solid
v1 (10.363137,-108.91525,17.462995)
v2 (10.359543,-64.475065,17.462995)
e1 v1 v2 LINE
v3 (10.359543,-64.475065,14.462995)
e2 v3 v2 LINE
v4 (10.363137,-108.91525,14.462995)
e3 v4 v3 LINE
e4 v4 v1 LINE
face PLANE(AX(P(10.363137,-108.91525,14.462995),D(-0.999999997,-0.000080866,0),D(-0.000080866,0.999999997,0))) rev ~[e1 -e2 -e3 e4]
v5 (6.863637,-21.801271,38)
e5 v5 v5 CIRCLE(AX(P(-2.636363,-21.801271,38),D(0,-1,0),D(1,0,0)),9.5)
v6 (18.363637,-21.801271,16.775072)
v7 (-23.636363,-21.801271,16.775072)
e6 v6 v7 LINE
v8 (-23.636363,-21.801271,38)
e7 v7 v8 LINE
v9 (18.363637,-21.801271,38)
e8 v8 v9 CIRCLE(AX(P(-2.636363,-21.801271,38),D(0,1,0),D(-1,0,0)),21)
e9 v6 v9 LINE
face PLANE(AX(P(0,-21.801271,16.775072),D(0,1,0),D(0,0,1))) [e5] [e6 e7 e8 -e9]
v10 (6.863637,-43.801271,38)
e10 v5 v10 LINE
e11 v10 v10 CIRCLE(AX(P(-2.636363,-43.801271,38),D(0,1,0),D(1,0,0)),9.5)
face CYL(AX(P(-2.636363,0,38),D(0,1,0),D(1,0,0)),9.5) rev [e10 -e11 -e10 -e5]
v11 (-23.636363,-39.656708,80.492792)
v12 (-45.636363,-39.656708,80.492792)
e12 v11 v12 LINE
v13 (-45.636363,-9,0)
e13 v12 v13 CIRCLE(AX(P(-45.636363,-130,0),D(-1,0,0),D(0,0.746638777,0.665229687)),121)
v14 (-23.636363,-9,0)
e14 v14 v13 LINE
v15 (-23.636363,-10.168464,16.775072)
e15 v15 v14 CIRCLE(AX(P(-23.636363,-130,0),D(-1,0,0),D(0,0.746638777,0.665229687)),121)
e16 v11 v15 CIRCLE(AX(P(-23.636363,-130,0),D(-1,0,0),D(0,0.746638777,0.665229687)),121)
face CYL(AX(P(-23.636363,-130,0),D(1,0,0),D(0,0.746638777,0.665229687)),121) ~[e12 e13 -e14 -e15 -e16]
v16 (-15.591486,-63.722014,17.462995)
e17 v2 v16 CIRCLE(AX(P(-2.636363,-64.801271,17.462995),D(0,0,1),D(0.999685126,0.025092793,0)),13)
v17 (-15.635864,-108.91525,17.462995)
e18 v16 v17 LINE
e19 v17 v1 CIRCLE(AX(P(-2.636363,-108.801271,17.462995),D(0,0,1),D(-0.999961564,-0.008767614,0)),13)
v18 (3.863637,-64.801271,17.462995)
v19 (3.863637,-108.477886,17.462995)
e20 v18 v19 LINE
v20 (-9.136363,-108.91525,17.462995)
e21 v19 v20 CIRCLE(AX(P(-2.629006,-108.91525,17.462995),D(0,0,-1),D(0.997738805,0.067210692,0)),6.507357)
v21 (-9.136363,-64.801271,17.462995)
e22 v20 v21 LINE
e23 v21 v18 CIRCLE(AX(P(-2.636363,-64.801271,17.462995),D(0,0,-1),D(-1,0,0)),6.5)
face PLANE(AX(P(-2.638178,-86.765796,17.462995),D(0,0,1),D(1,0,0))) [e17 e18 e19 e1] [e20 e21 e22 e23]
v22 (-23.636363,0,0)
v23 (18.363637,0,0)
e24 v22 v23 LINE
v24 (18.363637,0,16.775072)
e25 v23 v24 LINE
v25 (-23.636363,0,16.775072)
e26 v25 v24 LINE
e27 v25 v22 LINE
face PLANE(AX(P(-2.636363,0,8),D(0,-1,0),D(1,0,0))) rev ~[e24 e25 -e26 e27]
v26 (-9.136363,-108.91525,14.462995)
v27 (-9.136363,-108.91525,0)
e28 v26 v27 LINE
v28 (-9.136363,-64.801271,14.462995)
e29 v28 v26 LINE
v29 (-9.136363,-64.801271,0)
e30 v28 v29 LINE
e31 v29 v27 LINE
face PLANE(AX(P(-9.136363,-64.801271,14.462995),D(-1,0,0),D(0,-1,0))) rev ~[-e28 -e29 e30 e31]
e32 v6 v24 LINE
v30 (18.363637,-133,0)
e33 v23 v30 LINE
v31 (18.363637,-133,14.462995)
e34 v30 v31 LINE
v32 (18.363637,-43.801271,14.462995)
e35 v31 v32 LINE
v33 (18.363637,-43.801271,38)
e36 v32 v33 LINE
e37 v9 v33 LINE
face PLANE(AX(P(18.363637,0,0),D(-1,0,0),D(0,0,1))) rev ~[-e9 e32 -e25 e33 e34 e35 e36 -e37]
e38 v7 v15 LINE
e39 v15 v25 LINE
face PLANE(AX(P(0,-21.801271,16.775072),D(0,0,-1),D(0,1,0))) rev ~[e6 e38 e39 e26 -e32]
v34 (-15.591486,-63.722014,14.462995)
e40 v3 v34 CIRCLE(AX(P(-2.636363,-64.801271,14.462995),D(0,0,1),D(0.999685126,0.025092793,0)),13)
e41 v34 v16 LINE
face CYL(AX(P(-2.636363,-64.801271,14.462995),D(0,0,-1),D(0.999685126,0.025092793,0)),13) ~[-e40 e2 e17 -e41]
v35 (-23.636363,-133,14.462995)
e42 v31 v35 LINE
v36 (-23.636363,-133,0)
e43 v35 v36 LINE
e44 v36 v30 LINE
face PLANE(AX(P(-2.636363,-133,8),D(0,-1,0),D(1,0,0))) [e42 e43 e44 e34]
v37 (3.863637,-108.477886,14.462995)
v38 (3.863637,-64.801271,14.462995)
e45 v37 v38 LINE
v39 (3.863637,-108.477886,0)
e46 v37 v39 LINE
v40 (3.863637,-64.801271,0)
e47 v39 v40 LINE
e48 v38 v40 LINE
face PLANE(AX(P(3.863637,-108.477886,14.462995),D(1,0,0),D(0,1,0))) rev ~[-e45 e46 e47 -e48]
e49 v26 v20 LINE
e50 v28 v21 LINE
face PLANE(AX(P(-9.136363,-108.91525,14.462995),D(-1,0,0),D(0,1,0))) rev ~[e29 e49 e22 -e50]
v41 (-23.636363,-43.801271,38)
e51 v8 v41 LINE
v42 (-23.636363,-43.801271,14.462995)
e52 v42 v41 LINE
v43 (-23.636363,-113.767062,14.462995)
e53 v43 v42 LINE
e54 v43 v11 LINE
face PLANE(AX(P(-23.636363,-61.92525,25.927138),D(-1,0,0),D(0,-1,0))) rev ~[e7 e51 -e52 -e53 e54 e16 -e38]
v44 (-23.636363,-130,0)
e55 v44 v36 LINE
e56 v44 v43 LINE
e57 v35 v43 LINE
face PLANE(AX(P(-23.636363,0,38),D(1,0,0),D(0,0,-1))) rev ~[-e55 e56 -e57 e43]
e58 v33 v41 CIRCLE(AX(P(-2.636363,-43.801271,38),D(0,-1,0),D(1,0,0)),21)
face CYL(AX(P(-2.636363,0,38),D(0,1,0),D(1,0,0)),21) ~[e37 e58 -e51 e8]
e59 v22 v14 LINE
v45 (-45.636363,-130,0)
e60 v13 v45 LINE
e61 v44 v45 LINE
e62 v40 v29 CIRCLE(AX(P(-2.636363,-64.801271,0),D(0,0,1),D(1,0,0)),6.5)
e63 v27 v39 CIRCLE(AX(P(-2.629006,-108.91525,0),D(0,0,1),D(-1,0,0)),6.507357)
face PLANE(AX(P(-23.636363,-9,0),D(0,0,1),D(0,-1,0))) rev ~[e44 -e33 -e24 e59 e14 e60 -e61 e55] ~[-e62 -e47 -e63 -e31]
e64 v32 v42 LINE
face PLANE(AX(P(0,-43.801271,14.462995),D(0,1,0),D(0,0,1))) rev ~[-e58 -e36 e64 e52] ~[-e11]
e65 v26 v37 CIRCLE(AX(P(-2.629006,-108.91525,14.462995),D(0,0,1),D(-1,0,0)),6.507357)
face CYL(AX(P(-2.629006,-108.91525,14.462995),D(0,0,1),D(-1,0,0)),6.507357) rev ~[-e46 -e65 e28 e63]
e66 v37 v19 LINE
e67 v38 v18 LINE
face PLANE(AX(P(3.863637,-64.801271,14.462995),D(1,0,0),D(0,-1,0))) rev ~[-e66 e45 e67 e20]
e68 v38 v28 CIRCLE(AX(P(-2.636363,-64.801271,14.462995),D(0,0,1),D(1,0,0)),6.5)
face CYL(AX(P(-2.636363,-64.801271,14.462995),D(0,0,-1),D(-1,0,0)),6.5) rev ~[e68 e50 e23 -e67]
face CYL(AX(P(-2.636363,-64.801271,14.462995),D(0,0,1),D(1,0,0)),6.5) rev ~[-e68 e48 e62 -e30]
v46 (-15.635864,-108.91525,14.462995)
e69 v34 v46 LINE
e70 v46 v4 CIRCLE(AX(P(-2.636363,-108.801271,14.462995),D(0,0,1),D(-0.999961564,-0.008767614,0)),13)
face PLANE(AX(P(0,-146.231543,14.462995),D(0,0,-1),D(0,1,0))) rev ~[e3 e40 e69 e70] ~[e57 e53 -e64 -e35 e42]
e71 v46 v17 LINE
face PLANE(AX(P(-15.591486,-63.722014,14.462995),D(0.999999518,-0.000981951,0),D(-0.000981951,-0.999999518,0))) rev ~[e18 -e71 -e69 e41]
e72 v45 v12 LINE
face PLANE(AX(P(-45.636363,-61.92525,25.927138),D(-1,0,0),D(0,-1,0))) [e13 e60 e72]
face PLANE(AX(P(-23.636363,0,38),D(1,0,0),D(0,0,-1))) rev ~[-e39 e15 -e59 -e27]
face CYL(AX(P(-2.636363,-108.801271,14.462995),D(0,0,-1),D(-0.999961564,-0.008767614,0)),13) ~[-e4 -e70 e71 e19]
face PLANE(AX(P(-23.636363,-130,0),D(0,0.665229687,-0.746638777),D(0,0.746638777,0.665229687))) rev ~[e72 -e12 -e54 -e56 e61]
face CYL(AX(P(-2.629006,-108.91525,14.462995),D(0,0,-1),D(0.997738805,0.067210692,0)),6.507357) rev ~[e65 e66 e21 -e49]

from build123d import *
from build123d import SkipClean  # not in build123d's __all__

# Parameters (mm, degrees)
F0_W          = 42
F0_H          = 16
F0_R          = 9.5
F1_DEPTH      = 133
F2_W          = 35.961864282
F2_H          = 49.2198635868
F3_DEPTH      = 23.6373633247
F3_DEPTH_BACK = 25
F4_W          = 102.4302720154
F4_H          = 59.7613004169
F5_DEPTH      = 25
F5_DEPTH_BACK = 25
F7_DEPTH      = 22
F9_DEPTH      = 25
F10_DEPTH     = 3


with BuildPart() as f1:
    # F0 (on Front) → F1 (new body)
    with BuildSketch(Plane.XZ):
        with Locations((-2.6363633247, 8)):
            Rectangle(F0_W, F0_H)
        with BuildLine():
            Line((-23.6363633247, 38), (-23.6363633247, 16))
            Line((-23.6363633247, 16), (18.3636366753, 16))
            Line((18.3636366753, 16), (18.3636366753, 38))
            ThreePointArc((18.3636366753, 38), (-2.6363633247, 59), (-23.6363633247, 38))
        make_face()
        with Locations((-2.6363633247, 38)):
            Circle(F0_R, mode=Mode.SUBTRACT)
    extrude(amount=F1_DEPTH)

    # F2 (on Right) → F3 (cut, two sides)
    with BuildSketch(Plane.YZ) as f3_sk:
        with Locations((-3.8203388158, 41.385004092)):
            Rectangle(F2_W, F2_H)
    extrude(amount=-F3_DEPTH, mode=Mode.SUBTRACT)
    extrude(f3_sk.sketch, amount=F3_DEPTH_BACK, mode=Mode.SUBTRACT)

    # F4 (on Right) → F5 (cut, two sides)
    with BuildSketch(Plane.YZ) as f5_sk:
        with Locations((-95.0164069645, 44.3436447531)):
            Rectangle(F4_W, F4_H)
    extrude(amount=-F5_DEPTH, mode=Mode.SUBTRACT)
    extrude(f5_sk.sketch, amount=F5_DEPTH_BACK, mode=Mode.SUBTRACT)

    # F6 (on face) → F7 (join)
    with BuildSketch(Plane(origin=(-23.6363633247, 0, 0), x_dir=(0, -1, 0), z_dir=(-1, 0, 0))):
        with BuildLine():
            Line((9, 0), (130, 0))
            Line((130, 0), (39.6567079743, 80.4927921367))
            ThreePointArc((39.6567079743, 80.4927921367), (16.9236135723, 43.0665860319), (9, 0))
        make_face()
    extrude(amount=F7_DEPTH)

    # F8 (on face) → F9 (cut)
    with BuildSketch(Plane.XY.offset(14.4629945447)):
        with BuildLine():
            Line((3.8636366753, -108.4778859565), (3.8636366753, -64.8012709567))
            ThreePointArc((3.8636366753, -64.8012709567), (-2.6363633247, -58.3012709567), (-9.1363633247, -64.8012709567))
            Line((-9.1363633247, -64.8012709567), (-9.1363633247, -108.9152499387))
            ThreePointArc((-9.1363633247, -108.9152499387), (-2.410200406, -115.4189274994), (3.8636366753, -108.4778859565))
        make_face()
    extrude(amount=-F9_DEPTH, mode=Mode.SUBTRACT)

    # F8 (on face) → F10 (join)
    with BuildSketch(Plane.XY.offset(14.4629945447)):
        with BuildLine():
            Line((10.3631370038, -108.9152499387), (10.3595433171, -64.4750646478))
            ThreePointArc((10.3595433171, -64.4750646478), (-2.2592864442, -51.8067408373), (-15.5914860736, -63.7220144708))
            Line((-15.5914860736, -63.7220144708), (-15.6358636533, -108.9152499387))
            ThreePointArc((-15.6358636533, -108.9152499387), (-2.6363633247, -121.8012709567), (10.3631370038, -108.9152499387))
        make_face()
        with BuildLine():
            ThreePointArc((-9.1363633247, -64.8012709567), (-2.6363633247, -58.3012709567), (3.8636366753, -64.8012709567))
            Line((3.8636366753, -64.8012709567), (3.8636366753, -108.4778859565))
            ThreePointArc((3.8636366753, -108.4778859565), (-2.410200406, -115.4189274994), (-9.1363633247, -108.9152499387))
            Line((-9.1363633247, -108.9152499387), (-9.1363633247, -64.8012709567))
        make_face(mode=Mode.SUBTRACT)
    with SkipClean():  # cleaning this boolean's faces spoils the solid; the shape is the same uncleaned
        extrude(amount=F10_DEPTH)


solid = f1.part
